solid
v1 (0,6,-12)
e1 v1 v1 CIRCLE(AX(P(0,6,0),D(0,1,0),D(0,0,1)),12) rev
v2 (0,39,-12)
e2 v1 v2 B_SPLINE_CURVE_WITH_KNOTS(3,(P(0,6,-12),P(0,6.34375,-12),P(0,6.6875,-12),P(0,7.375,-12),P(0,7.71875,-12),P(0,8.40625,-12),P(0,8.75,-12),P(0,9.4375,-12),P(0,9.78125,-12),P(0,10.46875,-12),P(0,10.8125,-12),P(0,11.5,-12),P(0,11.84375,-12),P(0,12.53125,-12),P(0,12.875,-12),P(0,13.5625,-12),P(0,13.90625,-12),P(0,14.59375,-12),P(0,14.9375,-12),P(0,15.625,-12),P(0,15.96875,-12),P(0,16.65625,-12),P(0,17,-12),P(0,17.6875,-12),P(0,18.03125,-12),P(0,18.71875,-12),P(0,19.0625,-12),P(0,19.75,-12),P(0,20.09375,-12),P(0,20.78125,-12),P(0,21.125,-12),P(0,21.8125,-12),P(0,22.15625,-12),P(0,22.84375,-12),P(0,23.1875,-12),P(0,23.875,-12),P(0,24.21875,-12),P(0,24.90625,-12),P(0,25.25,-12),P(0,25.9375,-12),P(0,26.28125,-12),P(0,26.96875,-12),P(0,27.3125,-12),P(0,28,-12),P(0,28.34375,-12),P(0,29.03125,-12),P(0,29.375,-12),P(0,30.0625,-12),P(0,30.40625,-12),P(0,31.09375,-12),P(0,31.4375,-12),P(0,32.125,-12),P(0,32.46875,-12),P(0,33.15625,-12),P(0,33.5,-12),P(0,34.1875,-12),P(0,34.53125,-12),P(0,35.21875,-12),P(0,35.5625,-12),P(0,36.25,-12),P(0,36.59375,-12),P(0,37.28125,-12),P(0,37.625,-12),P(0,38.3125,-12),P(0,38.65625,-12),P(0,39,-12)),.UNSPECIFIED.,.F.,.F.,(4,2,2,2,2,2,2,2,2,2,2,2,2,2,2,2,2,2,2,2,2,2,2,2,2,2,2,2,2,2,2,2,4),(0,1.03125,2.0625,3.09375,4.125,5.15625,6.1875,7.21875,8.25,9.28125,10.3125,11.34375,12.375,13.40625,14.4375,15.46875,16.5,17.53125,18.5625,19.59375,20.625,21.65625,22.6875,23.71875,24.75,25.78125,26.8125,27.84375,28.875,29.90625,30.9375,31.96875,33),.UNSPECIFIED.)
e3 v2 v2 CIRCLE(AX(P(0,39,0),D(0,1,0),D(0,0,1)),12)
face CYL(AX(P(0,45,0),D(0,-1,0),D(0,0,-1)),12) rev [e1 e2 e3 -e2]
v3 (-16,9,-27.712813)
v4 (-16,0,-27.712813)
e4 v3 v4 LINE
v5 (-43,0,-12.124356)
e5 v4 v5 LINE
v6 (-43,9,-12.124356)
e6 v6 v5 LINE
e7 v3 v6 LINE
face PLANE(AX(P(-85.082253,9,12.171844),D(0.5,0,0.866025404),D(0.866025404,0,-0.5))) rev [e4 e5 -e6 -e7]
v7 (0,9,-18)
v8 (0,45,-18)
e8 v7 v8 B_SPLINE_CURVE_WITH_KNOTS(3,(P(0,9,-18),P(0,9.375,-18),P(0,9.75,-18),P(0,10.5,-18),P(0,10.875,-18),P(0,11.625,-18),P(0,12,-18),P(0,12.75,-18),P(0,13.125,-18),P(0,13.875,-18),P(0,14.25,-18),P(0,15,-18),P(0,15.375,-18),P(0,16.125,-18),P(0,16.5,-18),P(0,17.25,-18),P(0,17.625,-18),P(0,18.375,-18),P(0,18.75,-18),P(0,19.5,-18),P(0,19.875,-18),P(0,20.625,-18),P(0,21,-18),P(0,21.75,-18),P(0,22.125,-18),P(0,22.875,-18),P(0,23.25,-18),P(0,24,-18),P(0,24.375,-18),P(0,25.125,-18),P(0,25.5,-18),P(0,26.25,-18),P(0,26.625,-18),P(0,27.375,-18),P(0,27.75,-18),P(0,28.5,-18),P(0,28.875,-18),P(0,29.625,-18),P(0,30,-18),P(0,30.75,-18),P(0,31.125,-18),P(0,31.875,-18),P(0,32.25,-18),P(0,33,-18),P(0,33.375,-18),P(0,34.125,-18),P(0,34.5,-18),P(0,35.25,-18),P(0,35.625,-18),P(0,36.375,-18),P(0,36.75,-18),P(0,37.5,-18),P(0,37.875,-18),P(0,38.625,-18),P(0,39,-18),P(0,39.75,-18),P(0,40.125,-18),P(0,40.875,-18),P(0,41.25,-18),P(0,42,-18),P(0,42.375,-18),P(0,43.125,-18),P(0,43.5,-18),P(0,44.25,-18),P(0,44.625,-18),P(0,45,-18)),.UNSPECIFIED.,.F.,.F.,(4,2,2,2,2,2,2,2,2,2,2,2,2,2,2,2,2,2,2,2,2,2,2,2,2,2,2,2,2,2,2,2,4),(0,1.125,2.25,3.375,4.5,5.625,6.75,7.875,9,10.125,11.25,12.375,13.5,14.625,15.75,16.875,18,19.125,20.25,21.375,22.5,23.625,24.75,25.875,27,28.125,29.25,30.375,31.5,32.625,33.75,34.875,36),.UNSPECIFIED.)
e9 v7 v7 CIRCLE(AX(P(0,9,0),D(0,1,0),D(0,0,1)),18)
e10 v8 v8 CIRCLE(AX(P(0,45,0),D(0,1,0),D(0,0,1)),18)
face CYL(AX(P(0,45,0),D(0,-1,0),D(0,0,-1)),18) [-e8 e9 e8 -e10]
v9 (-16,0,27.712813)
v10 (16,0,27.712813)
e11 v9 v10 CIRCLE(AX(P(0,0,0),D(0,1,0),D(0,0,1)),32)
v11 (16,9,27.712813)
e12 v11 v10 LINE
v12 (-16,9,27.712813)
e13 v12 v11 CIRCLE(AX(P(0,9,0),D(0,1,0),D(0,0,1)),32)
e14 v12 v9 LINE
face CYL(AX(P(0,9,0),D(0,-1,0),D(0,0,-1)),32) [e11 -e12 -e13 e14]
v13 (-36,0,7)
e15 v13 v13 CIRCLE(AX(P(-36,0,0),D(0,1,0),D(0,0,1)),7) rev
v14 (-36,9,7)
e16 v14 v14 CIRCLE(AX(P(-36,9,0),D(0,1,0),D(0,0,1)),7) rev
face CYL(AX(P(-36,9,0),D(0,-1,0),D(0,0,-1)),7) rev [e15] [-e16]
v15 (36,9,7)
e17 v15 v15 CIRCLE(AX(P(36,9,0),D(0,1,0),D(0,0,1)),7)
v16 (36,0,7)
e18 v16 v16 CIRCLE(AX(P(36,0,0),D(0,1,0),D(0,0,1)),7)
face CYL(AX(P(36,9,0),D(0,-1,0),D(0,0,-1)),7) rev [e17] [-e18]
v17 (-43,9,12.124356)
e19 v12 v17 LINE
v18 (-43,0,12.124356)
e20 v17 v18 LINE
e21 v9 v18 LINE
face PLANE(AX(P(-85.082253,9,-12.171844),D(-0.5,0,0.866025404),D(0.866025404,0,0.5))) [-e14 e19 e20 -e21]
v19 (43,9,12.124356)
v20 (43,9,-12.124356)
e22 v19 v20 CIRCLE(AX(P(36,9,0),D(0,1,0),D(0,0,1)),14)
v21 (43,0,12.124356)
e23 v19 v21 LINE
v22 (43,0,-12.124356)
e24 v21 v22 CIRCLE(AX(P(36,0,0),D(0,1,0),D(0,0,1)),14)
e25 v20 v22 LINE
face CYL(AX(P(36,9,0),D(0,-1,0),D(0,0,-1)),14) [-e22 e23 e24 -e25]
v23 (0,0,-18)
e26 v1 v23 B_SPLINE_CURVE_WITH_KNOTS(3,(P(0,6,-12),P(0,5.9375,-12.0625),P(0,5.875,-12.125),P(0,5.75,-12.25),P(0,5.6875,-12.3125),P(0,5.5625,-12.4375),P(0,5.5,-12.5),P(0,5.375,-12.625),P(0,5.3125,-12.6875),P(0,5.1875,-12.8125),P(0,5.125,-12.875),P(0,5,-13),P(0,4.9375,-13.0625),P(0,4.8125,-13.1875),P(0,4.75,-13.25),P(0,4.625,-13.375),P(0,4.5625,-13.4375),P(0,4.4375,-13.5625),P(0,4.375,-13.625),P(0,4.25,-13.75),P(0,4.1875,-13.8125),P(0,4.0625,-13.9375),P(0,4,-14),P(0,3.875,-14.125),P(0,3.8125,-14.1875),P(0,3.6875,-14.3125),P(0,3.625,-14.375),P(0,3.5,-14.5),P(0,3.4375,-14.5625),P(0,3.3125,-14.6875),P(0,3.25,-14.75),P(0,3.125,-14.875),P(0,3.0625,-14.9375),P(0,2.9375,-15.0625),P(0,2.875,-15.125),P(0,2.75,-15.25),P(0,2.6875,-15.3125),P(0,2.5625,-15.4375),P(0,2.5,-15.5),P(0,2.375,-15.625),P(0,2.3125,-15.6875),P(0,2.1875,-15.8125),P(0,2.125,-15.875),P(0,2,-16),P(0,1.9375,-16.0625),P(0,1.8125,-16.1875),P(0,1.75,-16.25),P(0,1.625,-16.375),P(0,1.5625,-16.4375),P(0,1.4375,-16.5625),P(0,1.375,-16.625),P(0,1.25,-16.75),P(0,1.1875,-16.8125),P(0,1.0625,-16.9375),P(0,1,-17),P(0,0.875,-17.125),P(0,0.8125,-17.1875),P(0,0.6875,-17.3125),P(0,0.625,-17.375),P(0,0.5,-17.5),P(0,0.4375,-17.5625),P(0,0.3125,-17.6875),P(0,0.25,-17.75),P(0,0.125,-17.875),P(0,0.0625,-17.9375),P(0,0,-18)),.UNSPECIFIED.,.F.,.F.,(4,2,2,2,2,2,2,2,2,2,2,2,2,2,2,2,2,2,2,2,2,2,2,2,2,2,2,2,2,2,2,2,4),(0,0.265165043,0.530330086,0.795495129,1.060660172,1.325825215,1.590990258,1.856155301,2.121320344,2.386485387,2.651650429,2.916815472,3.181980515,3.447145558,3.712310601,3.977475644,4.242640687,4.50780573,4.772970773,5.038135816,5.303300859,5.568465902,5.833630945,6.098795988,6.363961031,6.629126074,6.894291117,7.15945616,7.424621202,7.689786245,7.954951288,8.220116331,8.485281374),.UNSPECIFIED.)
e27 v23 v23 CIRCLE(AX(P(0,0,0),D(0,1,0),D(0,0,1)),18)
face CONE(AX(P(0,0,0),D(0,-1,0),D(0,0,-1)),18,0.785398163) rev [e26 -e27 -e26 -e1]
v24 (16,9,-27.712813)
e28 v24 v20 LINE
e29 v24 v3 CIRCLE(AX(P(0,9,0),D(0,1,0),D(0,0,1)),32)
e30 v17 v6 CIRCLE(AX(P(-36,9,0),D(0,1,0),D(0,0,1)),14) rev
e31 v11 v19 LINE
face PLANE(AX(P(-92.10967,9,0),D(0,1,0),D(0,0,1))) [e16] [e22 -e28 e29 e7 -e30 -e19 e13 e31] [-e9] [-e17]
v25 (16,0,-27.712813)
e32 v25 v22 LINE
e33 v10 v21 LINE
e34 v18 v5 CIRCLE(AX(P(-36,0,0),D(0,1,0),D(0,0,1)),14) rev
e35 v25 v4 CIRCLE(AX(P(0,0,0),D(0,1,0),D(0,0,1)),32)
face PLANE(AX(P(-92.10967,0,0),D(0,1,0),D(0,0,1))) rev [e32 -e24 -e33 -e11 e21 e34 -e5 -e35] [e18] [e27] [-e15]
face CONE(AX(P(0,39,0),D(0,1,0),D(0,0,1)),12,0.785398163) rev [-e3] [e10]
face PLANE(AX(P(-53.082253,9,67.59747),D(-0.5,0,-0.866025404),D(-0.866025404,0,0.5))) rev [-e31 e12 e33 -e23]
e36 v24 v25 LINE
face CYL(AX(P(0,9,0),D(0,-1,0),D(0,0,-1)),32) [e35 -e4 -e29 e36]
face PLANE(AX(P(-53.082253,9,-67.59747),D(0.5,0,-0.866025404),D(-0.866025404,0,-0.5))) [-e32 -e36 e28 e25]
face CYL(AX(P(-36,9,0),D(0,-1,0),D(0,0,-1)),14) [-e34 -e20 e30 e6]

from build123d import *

# Parameters (mm, degrees)
SKETCH_1_R      = 7
SKETCH_1_R_2    = 18
EXTRUDE_1_DEPTH = 9
SKETCH_1_3_R    = 18
SKETCH_1_3_R_2  = 12
EXTRUDE_2_DEPTH = 45
CHAMFER_1_SIZE  = 6


with BuildPart() as part:
    # 草圖1 → 填料-伸長1 (new body)
    with BuildSketch(Plane(origin=(0, 0, 0), x_dir=(1, 0, 0), z_dir=(0, 1, 0))):
        with BuildLine():
            Line((16, -27.712812921), (43, -12.124355653))
            ThreePointArc((43, -12.124355653), (50, 0), (43, 12.124355653))
            Line((43, 12.124355653), (16, 27.712812921))
            ThreePointArc((16, 27.712812921), (0, 32), (-16, 27.712812921))
            Line((-16, 27.712812921), (-43, 12.124355653))
            ThreePointArc((-43, 12.124355653), (-50, 0), (-43, -12.124355653))
            Line((-43, -12.124355653), (-16, -27.712812921))
            ThreePointArc((-16, -27.712812921), (0, -32), (16, -27.712812921))
        make_face()
        with Locations(Location((36, 0, 0), (0, 0, 270))):
            Circle(SKETCH_1_R, mode=Mode.SUBTRACT)
        with Locations(Location((-36, 0, 0), (0, 0, 270))):
            Circle(SKETCH_1_R, mode=Mode.SUBTRACT)
        with Locations(Location((0, 0, 0), (0, 0, 270))):
            Circle(SKETCH_1_R_2, mode=Mode.SUBTRACT)
    extrude(amount=EXTRUDE_1_DEPTH)

    # 草圖1<3> → 填料-伸長2 (add)
    with BuildSketch(Plane(origin=(0, 0, 0), x_dir=(1, 0, 0), z_dir=(0, 1, 0))):
        with Locations(Location((0, 0, 0), (0, 0, 90))):
            Circle(SKETCH_1_3_R)
        with Locations(Location((0, 0, 0), (0, 0, 90))):
            Circle(SKETCH_1_3_R_2, mode=Mode.SUBTRACT)
    extrude(amount=EXTRUDE_2_DEPTH)

    # 導角1
    chamfer_1_edges = [part.edges().sort_by_distance(p)[0] for p in [
        (0, 45, 12),
        (0, 0, 12),
    ]]
    chamfer(chamfer_1_edges, length=CHAMFER_1_SIZE - 0.0001)  # a hair under: the kernel refuses the full size


solid = part.part
